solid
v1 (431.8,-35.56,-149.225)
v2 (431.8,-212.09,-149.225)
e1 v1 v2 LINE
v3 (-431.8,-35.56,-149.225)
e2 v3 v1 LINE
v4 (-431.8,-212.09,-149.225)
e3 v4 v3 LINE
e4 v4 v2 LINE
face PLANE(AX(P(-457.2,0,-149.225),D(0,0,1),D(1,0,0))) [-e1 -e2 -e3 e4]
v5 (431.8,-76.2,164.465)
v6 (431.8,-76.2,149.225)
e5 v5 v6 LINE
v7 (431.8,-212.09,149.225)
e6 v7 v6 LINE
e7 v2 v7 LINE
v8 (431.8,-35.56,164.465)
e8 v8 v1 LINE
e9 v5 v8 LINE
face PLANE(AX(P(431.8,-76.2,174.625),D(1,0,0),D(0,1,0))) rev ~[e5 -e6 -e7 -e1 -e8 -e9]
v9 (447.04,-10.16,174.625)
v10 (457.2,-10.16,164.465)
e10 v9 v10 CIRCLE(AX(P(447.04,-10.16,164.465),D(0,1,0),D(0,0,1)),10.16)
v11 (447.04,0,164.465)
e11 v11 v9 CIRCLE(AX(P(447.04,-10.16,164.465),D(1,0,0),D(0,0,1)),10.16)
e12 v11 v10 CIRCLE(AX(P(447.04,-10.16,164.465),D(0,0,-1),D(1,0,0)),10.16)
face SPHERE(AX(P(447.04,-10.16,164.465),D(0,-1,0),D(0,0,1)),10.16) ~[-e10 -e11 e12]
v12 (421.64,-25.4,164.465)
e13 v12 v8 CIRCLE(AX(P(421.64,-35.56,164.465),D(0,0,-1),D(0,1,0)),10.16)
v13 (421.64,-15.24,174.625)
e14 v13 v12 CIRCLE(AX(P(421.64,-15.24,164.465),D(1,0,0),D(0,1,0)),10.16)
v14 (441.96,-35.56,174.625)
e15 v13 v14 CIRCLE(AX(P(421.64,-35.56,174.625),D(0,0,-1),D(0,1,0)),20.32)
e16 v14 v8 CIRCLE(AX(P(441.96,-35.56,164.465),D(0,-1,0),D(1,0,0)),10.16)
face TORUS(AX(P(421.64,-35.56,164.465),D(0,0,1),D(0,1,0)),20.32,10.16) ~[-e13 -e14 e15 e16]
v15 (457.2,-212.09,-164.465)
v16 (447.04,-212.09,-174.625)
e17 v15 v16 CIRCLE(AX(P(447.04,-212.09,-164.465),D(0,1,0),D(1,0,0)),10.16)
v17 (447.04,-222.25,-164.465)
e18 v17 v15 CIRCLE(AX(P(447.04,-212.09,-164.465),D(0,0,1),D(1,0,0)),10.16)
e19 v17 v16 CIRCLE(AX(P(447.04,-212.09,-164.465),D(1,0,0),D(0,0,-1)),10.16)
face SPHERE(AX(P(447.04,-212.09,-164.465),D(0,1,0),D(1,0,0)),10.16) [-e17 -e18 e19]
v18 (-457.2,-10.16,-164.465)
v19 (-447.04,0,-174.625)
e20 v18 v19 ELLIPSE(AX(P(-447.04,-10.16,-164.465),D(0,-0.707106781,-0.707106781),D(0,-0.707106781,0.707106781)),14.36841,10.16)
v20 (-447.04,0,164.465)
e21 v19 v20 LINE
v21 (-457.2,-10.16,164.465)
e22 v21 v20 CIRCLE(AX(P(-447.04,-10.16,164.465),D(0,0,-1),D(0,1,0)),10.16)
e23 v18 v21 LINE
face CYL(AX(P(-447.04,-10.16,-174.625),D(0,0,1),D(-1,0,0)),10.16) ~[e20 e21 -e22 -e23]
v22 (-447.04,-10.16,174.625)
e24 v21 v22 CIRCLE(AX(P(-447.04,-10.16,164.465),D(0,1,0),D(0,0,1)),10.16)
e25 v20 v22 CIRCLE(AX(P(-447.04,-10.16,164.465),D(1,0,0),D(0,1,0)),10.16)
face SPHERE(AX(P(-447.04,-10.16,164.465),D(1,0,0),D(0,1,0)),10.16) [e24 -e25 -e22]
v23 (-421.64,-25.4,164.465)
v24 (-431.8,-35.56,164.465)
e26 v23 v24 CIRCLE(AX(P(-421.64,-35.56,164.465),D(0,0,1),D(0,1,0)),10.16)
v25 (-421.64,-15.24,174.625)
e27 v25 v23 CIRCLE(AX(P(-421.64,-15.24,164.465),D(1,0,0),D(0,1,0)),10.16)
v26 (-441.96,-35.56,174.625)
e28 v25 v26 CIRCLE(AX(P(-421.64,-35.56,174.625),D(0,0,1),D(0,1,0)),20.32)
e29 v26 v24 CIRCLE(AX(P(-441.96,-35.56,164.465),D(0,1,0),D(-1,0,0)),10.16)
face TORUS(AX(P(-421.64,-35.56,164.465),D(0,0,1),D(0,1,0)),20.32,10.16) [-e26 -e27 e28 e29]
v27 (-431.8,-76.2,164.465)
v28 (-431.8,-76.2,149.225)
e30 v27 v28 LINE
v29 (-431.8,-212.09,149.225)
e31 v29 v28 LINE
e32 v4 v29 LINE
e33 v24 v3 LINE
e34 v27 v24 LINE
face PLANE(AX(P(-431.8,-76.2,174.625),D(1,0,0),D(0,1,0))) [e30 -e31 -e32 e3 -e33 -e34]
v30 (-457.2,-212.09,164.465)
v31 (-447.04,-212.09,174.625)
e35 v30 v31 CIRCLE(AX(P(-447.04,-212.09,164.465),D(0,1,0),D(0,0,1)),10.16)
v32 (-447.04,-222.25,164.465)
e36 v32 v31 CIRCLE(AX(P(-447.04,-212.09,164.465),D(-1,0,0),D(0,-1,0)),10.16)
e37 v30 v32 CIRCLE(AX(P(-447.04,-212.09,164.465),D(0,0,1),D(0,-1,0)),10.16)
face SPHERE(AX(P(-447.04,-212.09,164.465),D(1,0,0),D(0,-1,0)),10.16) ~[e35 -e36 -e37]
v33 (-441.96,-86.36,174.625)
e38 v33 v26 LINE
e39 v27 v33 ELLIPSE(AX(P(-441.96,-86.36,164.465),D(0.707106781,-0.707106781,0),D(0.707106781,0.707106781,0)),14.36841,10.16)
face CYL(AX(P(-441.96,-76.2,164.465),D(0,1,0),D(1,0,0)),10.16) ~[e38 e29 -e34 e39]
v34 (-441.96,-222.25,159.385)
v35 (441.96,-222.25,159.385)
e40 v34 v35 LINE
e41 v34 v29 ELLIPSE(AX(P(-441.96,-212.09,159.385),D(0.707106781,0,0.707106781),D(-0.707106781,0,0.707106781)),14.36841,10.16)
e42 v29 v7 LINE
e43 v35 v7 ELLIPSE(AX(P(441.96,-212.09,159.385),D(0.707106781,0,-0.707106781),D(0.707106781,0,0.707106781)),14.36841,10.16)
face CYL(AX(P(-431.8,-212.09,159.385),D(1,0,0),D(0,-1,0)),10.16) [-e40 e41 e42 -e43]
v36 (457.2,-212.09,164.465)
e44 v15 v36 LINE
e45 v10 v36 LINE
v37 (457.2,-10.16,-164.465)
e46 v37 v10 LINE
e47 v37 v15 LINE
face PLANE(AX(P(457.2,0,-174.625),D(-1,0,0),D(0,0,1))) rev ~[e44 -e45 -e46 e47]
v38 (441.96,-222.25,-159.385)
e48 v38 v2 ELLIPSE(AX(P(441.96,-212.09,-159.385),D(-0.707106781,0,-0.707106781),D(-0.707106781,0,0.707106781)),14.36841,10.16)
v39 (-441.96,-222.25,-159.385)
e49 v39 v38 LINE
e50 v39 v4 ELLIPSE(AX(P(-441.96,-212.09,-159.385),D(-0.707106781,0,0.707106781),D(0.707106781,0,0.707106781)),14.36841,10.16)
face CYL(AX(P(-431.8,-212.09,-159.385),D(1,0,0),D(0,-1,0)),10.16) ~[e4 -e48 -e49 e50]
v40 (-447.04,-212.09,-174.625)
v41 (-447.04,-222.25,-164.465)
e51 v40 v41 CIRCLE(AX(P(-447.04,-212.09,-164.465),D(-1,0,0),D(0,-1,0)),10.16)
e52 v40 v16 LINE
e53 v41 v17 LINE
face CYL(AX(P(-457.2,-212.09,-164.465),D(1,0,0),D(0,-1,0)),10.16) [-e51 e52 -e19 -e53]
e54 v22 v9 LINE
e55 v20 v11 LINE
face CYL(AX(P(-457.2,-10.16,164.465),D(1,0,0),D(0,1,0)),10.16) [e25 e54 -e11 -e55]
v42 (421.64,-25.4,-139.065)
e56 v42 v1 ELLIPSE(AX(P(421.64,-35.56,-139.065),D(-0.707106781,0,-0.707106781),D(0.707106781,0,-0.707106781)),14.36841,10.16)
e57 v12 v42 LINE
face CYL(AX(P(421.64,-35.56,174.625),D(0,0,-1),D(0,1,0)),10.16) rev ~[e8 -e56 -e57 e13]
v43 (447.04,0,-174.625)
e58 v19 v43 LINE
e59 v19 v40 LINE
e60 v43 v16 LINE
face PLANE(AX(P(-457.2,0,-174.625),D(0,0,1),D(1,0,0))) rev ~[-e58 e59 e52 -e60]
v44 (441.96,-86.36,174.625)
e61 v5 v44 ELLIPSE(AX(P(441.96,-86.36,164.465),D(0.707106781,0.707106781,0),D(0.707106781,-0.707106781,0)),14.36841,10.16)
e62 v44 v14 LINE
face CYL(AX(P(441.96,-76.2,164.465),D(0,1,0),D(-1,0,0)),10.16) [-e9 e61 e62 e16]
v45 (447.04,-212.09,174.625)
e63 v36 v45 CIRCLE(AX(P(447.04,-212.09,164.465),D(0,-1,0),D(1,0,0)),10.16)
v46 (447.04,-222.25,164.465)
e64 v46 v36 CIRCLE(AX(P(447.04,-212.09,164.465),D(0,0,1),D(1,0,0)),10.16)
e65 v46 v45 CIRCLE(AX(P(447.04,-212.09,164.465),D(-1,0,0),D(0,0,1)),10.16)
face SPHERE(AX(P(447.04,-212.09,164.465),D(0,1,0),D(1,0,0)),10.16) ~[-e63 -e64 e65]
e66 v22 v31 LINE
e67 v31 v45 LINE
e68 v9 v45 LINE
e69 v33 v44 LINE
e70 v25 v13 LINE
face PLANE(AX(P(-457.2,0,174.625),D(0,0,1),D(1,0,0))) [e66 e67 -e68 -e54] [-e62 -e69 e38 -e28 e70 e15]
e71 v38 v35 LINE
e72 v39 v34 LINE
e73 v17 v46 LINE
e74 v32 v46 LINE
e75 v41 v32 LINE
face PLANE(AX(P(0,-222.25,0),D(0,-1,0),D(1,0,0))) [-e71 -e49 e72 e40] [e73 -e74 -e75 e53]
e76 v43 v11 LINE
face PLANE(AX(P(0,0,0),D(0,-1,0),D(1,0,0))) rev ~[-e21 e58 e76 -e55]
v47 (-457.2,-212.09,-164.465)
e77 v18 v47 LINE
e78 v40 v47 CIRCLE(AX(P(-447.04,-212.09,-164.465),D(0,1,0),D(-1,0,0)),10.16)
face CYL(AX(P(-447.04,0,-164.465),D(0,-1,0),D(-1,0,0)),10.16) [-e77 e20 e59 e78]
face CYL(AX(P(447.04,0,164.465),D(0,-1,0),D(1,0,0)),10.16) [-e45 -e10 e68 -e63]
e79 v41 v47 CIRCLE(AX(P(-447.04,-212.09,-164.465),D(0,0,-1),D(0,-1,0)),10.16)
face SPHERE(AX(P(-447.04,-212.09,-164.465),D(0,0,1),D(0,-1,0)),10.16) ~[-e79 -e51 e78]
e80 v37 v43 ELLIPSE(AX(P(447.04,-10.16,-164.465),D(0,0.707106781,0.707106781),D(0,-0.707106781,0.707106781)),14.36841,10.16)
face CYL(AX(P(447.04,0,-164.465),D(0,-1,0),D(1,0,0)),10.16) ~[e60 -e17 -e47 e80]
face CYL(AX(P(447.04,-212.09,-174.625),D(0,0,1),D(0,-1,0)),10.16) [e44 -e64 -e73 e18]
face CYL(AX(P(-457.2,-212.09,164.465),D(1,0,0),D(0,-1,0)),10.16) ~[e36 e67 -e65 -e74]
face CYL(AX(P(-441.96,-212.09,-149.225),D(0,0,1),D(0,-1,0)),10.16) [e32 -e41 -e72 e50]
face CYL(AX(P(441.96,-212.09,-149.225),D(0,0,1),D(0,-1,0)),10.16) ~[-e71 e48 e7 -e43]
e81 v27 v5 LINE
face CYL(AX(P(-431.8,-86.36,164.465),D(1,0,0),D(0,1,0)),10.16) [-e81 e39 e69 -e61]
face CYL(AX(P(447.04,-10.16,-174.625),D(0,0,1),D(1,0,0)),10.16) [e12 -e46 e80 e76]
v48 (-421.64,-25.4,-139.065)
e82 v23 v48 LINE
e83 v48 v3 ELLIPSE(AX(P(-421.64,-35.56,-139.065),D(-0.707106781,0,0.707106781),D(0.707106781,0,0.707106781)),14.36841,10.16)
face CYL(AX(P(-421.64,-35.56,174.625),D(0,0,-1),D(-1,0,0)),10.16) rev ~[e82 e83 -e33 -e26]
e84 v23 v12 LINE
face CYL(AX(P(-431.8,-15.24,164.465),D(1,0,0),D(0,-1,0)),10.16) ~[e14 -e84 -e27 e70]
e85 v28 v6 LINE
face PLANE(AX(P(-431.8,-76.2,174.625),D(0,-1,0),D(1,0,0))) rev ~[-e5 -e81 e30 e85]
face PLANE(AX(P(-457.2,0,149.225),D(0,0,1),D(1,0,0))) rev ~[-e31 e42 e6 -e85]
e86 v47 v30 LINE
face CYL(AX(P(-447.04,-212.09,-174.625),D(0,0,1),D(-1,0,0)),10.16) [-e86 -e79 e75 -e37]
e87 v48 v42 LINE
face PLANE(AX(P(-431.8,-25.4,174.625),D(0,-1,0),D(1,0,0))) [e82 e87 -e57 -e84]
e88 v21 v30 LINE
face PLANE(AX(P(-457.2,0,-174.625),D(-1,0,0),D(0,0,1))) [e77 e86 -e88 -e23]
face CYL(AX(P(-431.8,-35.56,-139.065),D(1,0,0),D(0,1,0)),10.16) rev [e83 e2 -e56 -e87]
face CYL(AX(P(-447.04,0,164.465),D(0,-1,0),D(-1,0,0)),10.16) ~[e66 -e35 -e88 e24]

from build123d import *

# Parameters (mm, degrees)
F0_W     = 914.4
F0_H     = 349.25
F1_DEPTH = 222.25
F2_T     = -25.4
F3_W     = 863.6
F3_H     = 50.8
F4_DEPTH = 25.4
F5_R     = 10.16


with BuildPart() as f1:
    # F0 (on Front) → F1 (new body)
    with BuildSketch(Plane.XZ):
        Rectangle(F0_W, F0_H)
    extrude(amount=F1_DEPTH)

    # F2
    f2_openings = [f1.faces().sort_by_distance(p)[0] for p in [
        (0, -222.25, 0),
    ]]
    offset(amount=F2_T, openings=f2_openings)

    # F3 (on face) → F4 (cut)
    with BuildSketch(Plane.XY.offset(174.625)):
        with Locations((0, -50.8)):
            Rectangle(F3_W, F3_H)
    extrude(amount=-F4_DEPTH, mode=Mode.SUBTRACT)

    # F5
    f5_edges = [f1.edges().sort_by_distance(p)[0] for p in [
        (457.2, -111.125, 174.625),
        (0, 0, 174.625),
        (457.2, 0, 0),
        (457.2, -111.125, -174.625),
        (457.2, -222.25, 0),
        (431.8, -25.4, 12.7),
        (0, -25.4, -149.225),
        (-431.8, -25.4, 12.7),
        (0, -25.4, 174.625),
        (0, -222.25, 174.625),
        (-457.2, -222.25, 0),
        (0, -222.25, -174.625),
        (431.8, -222.25, 0),
        (0, -222.25, -149.225),
        (-431.8, -222.25, 0),
        (0, -222.25, 149.225),
        (-457.2, 0, 0),
        (-457.2, -111.125, 174.625),
        (-457.2, -111.125, -174.625),
        (0, -76.2, 174.625),
        (-431.8, -50.8, 174.625),
        (431.8, -50.8, 174.625),
    ]]
    fillet(f5_edges, radius=F5_R)


solid = f1.part
